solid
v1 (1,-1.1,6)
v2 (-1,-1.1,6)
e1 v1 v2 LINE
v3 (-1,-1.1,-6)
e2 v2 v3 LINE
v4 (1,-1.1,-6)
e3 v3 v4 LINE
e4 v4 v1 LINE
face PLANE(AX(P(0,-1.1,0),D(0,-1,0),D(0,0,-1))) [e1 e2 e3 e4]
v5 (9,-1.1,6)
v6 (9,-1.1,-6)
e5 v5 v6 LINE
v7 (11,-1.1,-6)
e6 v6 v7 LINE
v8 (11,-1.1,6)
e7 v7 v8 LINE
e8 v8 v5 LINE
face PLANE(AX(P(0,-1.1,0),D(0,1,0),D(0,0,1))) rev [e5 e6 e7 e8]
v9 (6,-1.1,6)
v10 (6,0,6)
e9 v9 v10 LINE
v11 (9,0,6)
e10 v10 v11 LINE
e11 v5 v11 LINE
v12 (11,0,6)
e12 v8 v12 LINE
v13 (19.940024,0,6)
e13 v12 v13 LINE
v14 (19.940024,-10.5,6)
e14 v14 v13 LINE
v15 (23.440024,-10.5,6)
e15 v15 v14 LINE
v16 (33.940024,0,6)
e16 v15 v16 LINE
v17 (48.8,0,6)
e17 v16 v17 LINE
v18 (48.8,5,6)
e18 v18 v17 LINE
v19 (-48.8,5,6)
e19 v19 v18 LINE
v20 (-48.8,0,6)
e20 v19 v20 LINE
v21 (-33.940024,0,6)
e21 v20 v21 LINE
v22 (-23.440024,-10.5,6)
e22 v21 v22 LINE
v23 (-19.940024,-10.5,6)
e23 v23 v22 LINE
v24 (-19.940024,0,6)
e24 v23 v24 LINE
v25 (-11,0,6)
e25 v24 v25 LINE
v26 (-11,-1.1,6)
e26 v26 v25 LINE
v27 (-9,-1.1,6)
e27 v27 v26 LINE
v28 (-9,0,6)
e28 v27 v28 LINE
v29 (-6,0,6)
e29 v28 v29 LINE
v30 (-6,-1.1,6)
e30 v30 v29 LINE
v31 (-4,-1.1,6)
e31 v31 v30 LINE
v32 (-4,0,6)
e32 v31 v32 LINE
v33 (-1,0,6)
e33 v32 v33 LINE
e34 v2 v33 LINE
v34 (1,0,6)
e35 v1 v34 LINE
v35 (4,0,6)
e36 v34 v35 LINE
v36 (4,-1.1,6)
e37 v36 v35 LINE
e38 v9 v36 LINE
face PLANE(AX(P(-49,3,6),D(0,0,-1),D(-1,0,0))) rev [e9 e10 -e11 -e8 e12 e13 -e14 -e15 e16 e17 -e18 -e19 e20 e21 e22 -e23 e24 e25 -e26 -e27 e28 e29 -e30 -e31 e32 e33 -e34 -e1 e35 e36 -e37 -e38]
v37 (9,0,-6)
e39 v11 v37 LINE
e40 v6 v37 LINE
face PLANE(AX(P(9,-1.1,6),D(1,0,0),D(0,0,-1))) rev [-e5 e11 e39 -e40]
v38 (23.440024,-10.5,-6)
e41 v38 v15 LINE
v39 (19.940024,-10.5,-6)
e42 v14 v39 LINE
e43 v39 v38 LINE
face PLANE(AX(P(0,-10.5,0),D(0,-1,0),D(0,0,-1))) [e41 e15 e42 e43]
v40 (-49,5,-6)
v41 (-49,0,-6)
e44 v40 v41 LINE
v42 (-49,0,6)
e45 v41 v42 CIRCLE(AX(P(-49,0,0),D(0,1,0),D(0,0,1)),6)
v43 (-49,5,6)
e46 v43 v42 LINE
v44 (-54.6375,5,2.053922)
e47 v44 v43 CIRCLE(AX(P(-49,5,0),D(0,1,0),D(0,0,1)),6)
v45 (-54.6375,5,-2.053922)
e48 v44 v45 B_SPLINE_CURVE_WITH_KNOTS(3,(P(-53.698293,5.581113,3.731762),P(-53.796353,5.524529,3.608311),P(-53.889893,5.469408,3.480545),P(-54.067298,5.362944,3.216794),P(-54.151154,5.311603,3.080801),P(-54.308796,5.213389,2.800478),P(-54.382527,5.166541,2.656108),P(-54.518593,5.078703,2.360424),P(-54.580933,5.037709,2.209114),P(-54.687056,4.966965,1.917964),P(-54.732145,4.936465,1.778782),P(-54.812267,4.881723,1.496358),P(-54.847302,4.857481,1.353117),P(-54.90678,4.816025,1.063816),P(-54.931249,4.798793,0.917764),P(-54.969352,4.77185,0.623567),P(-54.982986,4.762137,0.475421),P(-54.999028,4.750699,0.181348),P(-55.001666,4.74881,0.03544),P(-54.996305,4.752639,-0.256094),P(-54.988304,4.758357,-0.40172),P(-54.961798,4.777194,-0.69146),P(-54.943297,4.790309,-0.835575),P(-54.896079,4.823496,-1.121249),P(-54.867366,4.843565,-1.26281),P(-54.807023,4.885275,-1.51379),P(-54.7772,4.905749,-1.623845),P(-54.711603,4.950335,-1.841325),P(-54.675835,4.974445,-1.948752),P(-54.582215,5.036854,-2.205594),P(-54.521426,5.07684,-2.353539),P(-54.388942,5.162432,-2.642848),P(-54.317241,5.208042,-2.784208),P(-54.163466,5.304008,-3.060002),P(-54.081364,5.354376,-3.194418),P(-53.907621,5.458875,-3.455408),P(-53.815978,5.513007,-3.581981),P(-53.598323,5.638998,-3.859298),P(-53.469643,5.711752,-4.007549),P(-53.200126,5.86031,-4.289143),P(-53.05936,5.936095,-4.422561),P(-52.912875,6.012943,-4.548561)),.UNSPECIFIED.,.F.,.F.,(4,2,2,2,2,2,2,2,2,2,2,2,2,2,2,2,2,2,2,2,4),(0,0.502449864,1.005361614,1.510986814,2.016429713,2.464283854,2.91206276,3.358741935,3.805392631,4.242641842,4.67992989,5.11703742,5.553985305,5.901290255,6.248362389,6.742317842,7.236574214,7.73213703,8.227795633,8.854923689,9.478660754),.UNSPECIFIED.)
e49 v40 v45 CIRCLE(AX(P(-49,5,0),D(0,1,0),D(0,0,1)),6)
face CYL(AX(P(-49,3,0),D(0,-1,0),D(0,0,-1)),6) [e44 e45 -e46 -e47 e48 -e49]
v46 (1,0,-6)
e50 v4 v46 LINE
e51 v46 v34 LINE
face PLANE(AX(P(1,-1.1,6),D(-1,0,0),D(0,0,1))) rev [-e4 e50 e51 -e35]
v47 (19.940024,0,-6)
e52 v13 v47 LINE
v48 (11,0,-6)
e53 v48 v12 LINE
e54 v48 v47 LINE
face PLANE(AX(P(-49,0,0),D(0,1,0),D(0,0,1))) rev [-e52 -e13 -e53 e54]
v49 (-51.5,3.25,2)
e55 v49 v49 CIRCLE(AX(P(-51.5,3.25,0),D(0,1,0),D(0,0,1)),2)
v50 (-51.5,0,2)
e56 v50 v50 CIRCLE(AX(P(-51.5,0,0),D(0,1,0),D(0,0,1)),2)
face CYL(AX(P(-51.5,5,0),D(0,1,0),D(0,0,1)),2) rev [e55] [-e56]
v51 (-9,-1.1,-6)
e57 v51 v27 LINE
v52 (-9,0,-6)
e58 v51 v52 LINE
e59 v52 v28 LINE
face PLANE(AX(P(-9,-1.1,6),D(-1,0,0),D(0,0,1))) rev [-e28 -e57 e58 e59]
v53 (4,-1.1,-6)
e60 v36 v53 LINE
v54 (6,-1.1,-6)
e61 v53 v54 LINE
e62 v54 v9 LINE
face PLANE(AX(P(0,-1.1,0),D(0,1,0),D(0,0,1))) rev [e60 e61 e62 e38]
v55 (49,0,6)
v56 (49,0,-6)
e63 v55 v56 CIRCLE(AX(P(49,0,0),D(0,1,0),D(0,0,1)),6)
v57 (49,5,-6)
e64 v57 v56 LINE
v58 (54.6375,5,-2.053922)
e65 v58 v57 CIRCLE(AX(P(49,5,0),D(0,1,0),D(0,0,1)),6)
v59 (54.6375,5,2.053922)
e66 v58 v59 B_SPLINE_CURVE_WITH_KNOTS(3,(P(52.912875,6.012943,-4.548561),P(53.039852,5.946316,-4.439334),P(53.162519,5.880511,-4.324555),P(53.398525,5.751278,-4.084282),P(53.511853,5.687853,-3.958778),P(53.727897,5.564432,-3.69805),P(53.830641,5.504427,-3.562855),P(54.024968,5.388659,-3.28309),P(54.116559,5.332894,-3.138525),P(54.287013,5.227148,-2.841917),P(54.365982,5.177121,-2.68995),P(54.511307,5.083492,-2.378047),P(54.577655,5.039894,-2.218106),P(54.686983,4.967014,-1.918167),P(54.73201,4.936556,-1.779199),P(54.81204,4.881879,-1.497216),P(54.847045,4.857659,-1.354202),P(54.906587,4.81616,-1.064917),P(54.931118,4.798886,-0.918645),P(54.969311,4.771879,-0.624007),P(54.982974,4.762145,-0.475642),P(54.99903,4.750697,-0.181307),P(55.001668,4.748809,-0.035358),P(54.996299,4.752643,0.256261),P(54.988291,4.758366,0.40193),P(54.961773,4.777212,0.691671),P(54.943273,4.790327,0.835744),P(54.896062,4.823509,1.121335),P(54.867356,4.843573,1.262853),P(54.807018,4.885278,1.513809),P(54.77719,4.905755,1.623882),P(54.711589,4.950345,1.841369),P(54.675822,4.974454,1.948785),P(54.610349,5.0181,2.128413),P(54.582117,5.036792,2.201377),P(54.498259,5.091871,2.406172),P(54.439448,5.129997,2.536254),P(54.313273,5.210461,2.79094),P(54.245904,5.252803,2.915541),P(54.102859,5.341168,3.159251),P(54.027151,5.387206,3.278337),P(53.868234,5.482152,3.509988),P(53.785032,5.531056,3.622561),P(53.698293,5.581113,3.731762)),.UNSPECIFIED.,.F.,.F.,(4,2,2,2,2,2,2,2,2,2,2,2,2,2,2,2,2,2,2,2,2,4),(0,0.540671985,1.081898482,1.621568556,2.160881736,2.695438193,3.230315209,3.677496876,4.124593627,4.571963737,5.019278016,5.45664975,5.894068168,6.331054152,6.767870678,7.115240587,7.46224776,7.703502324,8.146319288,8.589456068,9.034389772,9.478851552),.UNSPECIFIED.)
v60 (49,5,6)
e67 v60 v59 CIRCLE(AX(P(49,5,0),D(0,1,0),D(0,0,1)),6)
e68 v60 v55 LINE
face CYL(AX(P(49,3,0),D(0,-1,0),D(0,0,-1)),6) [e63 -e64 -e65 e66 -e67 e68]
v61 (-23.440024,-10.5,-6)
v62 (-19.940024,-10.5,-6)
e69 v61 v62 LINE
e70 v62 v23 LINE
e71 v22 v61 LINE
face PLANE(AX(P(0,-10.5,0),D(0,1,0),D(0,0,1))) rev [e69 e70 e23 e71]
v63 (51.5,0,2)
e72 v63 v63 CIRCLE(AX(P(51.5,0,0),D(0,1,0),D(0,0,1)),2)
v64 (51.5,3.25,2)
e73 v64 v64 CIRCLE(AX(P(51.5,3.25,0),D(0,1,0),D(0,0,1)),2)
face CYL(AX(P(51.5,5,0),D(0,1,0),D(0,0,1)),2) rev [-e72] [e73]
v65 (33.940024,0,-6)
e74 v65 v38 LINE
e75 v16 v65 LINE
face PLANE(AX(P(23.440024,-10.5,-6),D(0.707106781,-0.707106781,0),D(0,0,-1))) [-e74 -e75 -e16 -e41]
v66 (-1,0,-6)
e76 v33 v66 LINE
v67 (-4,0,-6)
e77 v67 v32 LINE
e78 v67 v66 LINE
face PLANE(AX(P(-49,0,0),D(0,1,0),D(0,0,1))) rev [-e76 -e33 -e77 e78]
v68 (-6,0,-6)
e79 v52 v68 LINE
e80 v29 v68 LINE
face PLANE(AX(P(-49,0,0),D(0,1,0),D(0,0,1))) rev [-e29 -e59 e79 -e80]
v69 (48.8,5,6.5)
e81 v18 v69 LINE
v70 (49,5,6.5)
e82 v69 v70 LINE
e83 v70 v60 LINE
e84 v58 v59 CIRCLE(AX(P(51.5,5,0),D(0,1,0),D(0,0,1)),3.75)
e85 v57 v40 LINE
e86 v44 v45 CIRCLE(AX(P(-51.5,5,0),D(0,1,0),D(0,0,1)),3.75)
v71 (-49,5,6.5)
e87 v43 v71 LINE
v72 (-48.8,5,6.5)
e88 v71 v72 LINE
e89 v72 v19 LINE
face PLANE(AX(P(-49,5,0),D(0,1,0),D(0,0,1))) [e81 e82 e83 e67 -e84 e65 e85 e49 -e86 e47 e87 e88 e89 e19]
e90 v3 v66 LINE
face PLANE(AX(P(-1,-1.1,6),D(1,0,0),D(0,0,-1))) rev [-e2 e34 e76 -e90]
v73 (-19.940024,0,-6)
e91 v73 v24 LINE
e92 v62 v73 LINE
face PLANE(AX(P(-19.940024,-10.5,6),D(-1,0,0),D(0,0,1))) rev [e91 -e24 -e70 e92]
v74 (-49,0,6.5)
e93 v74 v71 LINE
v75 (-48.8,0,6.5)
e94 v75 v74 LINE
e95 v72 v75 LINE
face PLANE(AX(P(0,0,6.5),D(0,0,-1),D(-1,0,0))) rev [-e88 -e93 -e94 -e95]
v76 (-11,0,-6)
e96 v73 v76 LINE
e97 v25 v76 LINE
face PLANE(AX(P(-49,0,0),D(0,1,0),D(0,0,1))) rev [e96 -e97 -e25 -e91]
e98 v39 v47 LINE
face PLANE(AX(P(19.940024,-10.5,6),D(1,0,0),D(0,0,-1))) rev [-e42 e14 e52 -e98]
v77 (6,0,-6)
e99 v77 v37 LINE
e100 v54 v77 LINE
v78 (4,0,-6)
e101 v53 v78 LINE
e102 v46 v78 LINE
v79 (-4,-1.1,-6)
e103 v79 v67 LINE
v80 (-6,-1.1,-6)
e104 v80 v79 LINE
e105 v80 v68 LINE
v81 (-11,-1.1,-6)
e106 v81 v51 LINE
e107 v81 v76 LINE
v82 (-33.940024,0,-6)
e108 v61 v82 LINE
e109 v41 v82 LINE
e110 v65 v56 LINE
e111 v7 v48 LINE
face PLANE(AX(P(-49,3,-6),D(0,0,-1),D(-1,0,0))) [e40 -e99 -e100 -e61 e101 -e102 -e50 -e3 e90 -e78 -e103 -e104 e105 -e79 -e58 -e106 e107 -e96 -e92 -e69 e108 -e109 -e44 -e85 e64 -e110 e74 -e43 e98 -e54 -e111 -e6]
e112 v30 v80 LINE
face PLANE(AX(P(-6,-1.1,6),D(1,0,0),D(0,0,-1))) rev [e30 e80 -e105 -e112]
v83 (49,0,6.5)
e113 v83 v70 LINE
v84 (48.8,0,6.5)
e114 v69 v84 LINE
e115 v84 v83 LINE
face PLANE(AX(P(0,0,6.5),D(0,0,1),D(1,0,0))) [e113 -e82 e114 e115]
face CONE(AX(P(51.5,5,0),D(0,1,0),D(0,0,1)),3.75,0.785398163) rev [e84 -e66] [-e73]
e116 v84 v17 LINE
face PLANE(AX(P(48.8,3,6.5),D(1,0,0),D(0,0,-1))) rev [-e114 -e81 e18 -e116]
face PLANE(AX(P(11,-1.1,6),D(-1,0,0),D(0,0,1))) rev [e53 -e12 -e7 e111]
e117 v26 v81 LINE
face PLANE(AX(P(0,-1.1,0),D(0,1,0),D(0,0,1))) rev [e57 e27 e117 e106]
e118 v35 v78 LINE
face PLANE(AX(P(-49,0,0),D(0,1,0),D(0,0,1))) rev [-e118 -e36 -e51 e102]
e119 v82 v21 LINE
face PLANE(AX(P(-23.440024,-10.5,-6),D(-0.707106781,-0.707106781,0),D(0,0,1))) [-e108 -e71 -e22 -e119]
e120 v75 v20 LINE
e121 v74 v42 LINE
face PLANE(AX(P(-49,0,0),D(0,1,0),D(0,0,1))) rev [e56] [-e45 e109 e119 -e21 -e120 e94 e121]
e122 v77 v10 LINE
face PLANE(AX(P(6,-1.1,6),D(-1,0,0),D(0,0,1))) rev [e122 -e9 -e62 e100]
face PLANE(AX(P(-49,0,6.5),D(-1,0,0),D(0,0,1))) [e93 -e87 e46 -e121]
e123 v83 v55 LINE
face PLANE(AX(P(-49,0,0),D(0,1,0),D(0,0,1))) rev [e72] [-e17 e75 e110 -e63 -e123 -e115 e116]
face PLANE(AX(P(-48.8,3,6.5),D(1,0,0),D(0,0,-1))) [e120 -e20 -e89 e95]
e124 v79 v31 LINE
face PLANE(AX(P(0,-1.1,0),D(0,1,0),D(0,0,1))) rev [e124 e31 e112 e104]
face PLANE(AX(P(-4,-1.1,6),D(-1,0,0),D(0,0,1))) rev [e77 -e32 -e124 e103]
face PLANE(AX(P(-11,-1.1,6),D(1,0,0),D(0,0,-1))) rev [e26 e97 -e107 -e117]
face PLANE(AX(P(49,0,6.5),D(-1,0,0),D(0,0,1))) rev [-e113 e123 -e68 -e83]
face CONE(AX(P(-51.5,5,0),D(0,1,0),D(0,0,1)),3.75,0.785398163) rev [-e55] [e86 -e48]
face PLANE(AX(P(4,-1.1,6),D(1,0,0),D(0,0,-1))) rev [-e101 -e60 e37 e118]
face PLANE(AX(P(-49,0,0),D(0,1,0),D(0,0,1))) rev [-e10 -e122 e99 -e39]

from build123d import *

# Parameters (mm, degrees)
SKETCH1_R                     = 1.5
BOSS_EXTRUDE1_DEPTH           = 3
SKETCH4_W                     = 3.5
SKETCH4_H                     = 12
BOSS_EXTRUDE3_DEPTH           = 10.5
SKETCH5_W                     = 2
SKETCH5_H                     = 12
BOSS_EXTRUDE4_DEPTH           = 1.1
SKETCH6_W                     = 0.2
SKETCH6_H                     = 3
BOSS_EXTRUDE5_DEPTH           = 0.5
CHAMFER1_SIZE                 = 10.5
SKETCH10_R                    = 1.5
BOSS_EXTRUDE6_DEPTH           = 2
CSK_FOR_M4_SFHCS1_D           = 4
CSK_FOR_M4_SFHCS1_DEPTH       = 30.798278762
CSK_FOR_M4_SFHCS1_CSINK_D     = 7.5
CSK_FOR_M4_SFHCS1_CSINK_ANGLE = 90
CSK_FOR_M4_SFHCS1_TIP         = 1.201721238


with BuildPart() as part:
    # Sketch1 → Boss-Extrude1 (new body)
    with BuildSketch(Plane(origin=(0, 0, 0), x_dir=(1, 0, 0), z_dir=(0, 1, 0))):
        with BuildLine():
            Line((-49, 6), (49, 6))
            ThreePointArc((49, 6), (55, 0), (49, -6))
            Line((49, -6), (-49, -6))
            ThreePointArc((-49, -6), (-55, 0), (-49, 6))
        make_face()
        with Locations(Location((-51.5, 0, 0), (0, 0, 270))):
            Circle(SKETCH1_R, mode=Mode.SUBTRACT)
        with Locations(Location((51.5, 0, 0), (0, 0, 270))):
            Circle(SKETCH1_R, mode=Mode.SUBTRACT)
    extrude(amount=BOSS_EXTRUDE1_DEPTH)

    # Sketch4 → Boss-Extrude3 (add)
    with BuildSketch(Plane.XZ):
        with Locations((-21.690023983, 0)):
            Rectangle(SKETCH4_W, SKETCH4_H)
        with Locations((21.690023983, 0)):
            Rectangle(SKETCH4_W, SKETCH4_H)
    extrude(amount=BOSS_EXTRUDE3_DEPTH)

    # Sketch5 → Boss-Extrude4 (add)
    with BuildSketch(Plane.XZ):
        with Locations((5, 0)):
            Rectangle(SKETCH5_W, SKETCH5_H)
        Rectangle(SKETCH5_W, SKETCH5_H)
        with Locations((10, 0)):
            Rectangle(SKETCH5_W, SKETCH5_H)
        with Locations((-5, 0)):
            Rectangle(SKETCH5_W, SKETCH5_H)
        with Locations((-10, 0)):
            Rectangle(SKETCH5_W, SKETCH5_H)
    extrude(amount=BOSS_EXTRUDE4_DEPTH)

    # Sketch6 → Boss-Extrude5 (add)
    with BuildSketch(Plane.XY.offset(6)):
        with Locations((48.9, 1.5)):
            Rectangle(SKETCH6_W, SKETCH6_H)
        with Locations((-48.9, 1.5)):
            Rectangle(SKETCH6_W, SKETCH6_H)
    extrude(amount=BOSS_EXTRUDE5_DEPTH)

    # Chamfer1
    chamfer1_edges = [part.edges().sort_by_distance(p)[0] for p in [
        (-23.440023983, 0, 0),
        (23.440023983, 0, 0),
    ]]
    chamfer(chamfer1_edges, length=CHAMFER1_SIZE - 0.0001)  # a hair under: the kernel refuses the full size

    # Sketch10 → Boss-Extrude6 (add)
    with BuildSketch(Plane(origin=(0, 3, 0), x_dir=(1, 0, 0), z_dir=(0, 1, 0))):
        with BuildLine():
            Line((-49, -6), (-49, -6.5))
            Line((-49, -6.5), (-48.8, -6.5))
            Line((-48.8, -6.5), (-48.8, -6))
            Line((-48.8, -6), (48.8, -6))
            Line((48.8, -6), (48.8, -6.5))
            Line((48.8, -6.5), (49, -6.5))
            Line((49, -6.5), (49, -6))
            ThreePointArc((49, -6), (55, 0), (49, 6))
            Line((49, 6), (-49, 6))
            ThreePointArc((-49, 6), (-55, 0), (-49, -6))
        make_face()
        with Locations(Location((-51.5, 0, 0), (0, 0, 270))):
            Circle(SKETCH10_R, mode=Mode.SUBTRACT)
        with Locations(Location((51.5, 0, 0), (0, 0, 270))):
            Circle(SKETCH10_R, mode=Mode.SUBTRACT)
    extrude(amount=BOSS_EXTRUDE6_DEPTH)

    # CSK for M4 SFHCS1
    with Locations(Plane(origin=(0, 5, 0), x_dir=(1, 0, 0), z_dir=(0, 1, 0))):
        with Locations((51.5, 0), (-51.5, 0)):
            CounterSinkHole(CSK_FOR_M4_SFHCS1_D / 2, CSK_FOR_M4_SFHCS1_CSINK_D / 2, depth=CSK_FOR_M4_SFHCS1_DEPTH, counter_sink_angle=CSK_FOR_M4_SFHCS1_CSINK_ANGLE)
            with Locations((0, 0, -(CSK_FOR_M4_SFHCS1_DEPTH + CSK_FOR_M4_SFHCS1_TIP / 2))):  # 118° drill point
                Cone(0, CSK_FOR_M4_SFHCS1_D / 2, CSK_FOR_M4_SFHCS1_TIP, mode=Mode.SUBTRACT)


solid = part.part
